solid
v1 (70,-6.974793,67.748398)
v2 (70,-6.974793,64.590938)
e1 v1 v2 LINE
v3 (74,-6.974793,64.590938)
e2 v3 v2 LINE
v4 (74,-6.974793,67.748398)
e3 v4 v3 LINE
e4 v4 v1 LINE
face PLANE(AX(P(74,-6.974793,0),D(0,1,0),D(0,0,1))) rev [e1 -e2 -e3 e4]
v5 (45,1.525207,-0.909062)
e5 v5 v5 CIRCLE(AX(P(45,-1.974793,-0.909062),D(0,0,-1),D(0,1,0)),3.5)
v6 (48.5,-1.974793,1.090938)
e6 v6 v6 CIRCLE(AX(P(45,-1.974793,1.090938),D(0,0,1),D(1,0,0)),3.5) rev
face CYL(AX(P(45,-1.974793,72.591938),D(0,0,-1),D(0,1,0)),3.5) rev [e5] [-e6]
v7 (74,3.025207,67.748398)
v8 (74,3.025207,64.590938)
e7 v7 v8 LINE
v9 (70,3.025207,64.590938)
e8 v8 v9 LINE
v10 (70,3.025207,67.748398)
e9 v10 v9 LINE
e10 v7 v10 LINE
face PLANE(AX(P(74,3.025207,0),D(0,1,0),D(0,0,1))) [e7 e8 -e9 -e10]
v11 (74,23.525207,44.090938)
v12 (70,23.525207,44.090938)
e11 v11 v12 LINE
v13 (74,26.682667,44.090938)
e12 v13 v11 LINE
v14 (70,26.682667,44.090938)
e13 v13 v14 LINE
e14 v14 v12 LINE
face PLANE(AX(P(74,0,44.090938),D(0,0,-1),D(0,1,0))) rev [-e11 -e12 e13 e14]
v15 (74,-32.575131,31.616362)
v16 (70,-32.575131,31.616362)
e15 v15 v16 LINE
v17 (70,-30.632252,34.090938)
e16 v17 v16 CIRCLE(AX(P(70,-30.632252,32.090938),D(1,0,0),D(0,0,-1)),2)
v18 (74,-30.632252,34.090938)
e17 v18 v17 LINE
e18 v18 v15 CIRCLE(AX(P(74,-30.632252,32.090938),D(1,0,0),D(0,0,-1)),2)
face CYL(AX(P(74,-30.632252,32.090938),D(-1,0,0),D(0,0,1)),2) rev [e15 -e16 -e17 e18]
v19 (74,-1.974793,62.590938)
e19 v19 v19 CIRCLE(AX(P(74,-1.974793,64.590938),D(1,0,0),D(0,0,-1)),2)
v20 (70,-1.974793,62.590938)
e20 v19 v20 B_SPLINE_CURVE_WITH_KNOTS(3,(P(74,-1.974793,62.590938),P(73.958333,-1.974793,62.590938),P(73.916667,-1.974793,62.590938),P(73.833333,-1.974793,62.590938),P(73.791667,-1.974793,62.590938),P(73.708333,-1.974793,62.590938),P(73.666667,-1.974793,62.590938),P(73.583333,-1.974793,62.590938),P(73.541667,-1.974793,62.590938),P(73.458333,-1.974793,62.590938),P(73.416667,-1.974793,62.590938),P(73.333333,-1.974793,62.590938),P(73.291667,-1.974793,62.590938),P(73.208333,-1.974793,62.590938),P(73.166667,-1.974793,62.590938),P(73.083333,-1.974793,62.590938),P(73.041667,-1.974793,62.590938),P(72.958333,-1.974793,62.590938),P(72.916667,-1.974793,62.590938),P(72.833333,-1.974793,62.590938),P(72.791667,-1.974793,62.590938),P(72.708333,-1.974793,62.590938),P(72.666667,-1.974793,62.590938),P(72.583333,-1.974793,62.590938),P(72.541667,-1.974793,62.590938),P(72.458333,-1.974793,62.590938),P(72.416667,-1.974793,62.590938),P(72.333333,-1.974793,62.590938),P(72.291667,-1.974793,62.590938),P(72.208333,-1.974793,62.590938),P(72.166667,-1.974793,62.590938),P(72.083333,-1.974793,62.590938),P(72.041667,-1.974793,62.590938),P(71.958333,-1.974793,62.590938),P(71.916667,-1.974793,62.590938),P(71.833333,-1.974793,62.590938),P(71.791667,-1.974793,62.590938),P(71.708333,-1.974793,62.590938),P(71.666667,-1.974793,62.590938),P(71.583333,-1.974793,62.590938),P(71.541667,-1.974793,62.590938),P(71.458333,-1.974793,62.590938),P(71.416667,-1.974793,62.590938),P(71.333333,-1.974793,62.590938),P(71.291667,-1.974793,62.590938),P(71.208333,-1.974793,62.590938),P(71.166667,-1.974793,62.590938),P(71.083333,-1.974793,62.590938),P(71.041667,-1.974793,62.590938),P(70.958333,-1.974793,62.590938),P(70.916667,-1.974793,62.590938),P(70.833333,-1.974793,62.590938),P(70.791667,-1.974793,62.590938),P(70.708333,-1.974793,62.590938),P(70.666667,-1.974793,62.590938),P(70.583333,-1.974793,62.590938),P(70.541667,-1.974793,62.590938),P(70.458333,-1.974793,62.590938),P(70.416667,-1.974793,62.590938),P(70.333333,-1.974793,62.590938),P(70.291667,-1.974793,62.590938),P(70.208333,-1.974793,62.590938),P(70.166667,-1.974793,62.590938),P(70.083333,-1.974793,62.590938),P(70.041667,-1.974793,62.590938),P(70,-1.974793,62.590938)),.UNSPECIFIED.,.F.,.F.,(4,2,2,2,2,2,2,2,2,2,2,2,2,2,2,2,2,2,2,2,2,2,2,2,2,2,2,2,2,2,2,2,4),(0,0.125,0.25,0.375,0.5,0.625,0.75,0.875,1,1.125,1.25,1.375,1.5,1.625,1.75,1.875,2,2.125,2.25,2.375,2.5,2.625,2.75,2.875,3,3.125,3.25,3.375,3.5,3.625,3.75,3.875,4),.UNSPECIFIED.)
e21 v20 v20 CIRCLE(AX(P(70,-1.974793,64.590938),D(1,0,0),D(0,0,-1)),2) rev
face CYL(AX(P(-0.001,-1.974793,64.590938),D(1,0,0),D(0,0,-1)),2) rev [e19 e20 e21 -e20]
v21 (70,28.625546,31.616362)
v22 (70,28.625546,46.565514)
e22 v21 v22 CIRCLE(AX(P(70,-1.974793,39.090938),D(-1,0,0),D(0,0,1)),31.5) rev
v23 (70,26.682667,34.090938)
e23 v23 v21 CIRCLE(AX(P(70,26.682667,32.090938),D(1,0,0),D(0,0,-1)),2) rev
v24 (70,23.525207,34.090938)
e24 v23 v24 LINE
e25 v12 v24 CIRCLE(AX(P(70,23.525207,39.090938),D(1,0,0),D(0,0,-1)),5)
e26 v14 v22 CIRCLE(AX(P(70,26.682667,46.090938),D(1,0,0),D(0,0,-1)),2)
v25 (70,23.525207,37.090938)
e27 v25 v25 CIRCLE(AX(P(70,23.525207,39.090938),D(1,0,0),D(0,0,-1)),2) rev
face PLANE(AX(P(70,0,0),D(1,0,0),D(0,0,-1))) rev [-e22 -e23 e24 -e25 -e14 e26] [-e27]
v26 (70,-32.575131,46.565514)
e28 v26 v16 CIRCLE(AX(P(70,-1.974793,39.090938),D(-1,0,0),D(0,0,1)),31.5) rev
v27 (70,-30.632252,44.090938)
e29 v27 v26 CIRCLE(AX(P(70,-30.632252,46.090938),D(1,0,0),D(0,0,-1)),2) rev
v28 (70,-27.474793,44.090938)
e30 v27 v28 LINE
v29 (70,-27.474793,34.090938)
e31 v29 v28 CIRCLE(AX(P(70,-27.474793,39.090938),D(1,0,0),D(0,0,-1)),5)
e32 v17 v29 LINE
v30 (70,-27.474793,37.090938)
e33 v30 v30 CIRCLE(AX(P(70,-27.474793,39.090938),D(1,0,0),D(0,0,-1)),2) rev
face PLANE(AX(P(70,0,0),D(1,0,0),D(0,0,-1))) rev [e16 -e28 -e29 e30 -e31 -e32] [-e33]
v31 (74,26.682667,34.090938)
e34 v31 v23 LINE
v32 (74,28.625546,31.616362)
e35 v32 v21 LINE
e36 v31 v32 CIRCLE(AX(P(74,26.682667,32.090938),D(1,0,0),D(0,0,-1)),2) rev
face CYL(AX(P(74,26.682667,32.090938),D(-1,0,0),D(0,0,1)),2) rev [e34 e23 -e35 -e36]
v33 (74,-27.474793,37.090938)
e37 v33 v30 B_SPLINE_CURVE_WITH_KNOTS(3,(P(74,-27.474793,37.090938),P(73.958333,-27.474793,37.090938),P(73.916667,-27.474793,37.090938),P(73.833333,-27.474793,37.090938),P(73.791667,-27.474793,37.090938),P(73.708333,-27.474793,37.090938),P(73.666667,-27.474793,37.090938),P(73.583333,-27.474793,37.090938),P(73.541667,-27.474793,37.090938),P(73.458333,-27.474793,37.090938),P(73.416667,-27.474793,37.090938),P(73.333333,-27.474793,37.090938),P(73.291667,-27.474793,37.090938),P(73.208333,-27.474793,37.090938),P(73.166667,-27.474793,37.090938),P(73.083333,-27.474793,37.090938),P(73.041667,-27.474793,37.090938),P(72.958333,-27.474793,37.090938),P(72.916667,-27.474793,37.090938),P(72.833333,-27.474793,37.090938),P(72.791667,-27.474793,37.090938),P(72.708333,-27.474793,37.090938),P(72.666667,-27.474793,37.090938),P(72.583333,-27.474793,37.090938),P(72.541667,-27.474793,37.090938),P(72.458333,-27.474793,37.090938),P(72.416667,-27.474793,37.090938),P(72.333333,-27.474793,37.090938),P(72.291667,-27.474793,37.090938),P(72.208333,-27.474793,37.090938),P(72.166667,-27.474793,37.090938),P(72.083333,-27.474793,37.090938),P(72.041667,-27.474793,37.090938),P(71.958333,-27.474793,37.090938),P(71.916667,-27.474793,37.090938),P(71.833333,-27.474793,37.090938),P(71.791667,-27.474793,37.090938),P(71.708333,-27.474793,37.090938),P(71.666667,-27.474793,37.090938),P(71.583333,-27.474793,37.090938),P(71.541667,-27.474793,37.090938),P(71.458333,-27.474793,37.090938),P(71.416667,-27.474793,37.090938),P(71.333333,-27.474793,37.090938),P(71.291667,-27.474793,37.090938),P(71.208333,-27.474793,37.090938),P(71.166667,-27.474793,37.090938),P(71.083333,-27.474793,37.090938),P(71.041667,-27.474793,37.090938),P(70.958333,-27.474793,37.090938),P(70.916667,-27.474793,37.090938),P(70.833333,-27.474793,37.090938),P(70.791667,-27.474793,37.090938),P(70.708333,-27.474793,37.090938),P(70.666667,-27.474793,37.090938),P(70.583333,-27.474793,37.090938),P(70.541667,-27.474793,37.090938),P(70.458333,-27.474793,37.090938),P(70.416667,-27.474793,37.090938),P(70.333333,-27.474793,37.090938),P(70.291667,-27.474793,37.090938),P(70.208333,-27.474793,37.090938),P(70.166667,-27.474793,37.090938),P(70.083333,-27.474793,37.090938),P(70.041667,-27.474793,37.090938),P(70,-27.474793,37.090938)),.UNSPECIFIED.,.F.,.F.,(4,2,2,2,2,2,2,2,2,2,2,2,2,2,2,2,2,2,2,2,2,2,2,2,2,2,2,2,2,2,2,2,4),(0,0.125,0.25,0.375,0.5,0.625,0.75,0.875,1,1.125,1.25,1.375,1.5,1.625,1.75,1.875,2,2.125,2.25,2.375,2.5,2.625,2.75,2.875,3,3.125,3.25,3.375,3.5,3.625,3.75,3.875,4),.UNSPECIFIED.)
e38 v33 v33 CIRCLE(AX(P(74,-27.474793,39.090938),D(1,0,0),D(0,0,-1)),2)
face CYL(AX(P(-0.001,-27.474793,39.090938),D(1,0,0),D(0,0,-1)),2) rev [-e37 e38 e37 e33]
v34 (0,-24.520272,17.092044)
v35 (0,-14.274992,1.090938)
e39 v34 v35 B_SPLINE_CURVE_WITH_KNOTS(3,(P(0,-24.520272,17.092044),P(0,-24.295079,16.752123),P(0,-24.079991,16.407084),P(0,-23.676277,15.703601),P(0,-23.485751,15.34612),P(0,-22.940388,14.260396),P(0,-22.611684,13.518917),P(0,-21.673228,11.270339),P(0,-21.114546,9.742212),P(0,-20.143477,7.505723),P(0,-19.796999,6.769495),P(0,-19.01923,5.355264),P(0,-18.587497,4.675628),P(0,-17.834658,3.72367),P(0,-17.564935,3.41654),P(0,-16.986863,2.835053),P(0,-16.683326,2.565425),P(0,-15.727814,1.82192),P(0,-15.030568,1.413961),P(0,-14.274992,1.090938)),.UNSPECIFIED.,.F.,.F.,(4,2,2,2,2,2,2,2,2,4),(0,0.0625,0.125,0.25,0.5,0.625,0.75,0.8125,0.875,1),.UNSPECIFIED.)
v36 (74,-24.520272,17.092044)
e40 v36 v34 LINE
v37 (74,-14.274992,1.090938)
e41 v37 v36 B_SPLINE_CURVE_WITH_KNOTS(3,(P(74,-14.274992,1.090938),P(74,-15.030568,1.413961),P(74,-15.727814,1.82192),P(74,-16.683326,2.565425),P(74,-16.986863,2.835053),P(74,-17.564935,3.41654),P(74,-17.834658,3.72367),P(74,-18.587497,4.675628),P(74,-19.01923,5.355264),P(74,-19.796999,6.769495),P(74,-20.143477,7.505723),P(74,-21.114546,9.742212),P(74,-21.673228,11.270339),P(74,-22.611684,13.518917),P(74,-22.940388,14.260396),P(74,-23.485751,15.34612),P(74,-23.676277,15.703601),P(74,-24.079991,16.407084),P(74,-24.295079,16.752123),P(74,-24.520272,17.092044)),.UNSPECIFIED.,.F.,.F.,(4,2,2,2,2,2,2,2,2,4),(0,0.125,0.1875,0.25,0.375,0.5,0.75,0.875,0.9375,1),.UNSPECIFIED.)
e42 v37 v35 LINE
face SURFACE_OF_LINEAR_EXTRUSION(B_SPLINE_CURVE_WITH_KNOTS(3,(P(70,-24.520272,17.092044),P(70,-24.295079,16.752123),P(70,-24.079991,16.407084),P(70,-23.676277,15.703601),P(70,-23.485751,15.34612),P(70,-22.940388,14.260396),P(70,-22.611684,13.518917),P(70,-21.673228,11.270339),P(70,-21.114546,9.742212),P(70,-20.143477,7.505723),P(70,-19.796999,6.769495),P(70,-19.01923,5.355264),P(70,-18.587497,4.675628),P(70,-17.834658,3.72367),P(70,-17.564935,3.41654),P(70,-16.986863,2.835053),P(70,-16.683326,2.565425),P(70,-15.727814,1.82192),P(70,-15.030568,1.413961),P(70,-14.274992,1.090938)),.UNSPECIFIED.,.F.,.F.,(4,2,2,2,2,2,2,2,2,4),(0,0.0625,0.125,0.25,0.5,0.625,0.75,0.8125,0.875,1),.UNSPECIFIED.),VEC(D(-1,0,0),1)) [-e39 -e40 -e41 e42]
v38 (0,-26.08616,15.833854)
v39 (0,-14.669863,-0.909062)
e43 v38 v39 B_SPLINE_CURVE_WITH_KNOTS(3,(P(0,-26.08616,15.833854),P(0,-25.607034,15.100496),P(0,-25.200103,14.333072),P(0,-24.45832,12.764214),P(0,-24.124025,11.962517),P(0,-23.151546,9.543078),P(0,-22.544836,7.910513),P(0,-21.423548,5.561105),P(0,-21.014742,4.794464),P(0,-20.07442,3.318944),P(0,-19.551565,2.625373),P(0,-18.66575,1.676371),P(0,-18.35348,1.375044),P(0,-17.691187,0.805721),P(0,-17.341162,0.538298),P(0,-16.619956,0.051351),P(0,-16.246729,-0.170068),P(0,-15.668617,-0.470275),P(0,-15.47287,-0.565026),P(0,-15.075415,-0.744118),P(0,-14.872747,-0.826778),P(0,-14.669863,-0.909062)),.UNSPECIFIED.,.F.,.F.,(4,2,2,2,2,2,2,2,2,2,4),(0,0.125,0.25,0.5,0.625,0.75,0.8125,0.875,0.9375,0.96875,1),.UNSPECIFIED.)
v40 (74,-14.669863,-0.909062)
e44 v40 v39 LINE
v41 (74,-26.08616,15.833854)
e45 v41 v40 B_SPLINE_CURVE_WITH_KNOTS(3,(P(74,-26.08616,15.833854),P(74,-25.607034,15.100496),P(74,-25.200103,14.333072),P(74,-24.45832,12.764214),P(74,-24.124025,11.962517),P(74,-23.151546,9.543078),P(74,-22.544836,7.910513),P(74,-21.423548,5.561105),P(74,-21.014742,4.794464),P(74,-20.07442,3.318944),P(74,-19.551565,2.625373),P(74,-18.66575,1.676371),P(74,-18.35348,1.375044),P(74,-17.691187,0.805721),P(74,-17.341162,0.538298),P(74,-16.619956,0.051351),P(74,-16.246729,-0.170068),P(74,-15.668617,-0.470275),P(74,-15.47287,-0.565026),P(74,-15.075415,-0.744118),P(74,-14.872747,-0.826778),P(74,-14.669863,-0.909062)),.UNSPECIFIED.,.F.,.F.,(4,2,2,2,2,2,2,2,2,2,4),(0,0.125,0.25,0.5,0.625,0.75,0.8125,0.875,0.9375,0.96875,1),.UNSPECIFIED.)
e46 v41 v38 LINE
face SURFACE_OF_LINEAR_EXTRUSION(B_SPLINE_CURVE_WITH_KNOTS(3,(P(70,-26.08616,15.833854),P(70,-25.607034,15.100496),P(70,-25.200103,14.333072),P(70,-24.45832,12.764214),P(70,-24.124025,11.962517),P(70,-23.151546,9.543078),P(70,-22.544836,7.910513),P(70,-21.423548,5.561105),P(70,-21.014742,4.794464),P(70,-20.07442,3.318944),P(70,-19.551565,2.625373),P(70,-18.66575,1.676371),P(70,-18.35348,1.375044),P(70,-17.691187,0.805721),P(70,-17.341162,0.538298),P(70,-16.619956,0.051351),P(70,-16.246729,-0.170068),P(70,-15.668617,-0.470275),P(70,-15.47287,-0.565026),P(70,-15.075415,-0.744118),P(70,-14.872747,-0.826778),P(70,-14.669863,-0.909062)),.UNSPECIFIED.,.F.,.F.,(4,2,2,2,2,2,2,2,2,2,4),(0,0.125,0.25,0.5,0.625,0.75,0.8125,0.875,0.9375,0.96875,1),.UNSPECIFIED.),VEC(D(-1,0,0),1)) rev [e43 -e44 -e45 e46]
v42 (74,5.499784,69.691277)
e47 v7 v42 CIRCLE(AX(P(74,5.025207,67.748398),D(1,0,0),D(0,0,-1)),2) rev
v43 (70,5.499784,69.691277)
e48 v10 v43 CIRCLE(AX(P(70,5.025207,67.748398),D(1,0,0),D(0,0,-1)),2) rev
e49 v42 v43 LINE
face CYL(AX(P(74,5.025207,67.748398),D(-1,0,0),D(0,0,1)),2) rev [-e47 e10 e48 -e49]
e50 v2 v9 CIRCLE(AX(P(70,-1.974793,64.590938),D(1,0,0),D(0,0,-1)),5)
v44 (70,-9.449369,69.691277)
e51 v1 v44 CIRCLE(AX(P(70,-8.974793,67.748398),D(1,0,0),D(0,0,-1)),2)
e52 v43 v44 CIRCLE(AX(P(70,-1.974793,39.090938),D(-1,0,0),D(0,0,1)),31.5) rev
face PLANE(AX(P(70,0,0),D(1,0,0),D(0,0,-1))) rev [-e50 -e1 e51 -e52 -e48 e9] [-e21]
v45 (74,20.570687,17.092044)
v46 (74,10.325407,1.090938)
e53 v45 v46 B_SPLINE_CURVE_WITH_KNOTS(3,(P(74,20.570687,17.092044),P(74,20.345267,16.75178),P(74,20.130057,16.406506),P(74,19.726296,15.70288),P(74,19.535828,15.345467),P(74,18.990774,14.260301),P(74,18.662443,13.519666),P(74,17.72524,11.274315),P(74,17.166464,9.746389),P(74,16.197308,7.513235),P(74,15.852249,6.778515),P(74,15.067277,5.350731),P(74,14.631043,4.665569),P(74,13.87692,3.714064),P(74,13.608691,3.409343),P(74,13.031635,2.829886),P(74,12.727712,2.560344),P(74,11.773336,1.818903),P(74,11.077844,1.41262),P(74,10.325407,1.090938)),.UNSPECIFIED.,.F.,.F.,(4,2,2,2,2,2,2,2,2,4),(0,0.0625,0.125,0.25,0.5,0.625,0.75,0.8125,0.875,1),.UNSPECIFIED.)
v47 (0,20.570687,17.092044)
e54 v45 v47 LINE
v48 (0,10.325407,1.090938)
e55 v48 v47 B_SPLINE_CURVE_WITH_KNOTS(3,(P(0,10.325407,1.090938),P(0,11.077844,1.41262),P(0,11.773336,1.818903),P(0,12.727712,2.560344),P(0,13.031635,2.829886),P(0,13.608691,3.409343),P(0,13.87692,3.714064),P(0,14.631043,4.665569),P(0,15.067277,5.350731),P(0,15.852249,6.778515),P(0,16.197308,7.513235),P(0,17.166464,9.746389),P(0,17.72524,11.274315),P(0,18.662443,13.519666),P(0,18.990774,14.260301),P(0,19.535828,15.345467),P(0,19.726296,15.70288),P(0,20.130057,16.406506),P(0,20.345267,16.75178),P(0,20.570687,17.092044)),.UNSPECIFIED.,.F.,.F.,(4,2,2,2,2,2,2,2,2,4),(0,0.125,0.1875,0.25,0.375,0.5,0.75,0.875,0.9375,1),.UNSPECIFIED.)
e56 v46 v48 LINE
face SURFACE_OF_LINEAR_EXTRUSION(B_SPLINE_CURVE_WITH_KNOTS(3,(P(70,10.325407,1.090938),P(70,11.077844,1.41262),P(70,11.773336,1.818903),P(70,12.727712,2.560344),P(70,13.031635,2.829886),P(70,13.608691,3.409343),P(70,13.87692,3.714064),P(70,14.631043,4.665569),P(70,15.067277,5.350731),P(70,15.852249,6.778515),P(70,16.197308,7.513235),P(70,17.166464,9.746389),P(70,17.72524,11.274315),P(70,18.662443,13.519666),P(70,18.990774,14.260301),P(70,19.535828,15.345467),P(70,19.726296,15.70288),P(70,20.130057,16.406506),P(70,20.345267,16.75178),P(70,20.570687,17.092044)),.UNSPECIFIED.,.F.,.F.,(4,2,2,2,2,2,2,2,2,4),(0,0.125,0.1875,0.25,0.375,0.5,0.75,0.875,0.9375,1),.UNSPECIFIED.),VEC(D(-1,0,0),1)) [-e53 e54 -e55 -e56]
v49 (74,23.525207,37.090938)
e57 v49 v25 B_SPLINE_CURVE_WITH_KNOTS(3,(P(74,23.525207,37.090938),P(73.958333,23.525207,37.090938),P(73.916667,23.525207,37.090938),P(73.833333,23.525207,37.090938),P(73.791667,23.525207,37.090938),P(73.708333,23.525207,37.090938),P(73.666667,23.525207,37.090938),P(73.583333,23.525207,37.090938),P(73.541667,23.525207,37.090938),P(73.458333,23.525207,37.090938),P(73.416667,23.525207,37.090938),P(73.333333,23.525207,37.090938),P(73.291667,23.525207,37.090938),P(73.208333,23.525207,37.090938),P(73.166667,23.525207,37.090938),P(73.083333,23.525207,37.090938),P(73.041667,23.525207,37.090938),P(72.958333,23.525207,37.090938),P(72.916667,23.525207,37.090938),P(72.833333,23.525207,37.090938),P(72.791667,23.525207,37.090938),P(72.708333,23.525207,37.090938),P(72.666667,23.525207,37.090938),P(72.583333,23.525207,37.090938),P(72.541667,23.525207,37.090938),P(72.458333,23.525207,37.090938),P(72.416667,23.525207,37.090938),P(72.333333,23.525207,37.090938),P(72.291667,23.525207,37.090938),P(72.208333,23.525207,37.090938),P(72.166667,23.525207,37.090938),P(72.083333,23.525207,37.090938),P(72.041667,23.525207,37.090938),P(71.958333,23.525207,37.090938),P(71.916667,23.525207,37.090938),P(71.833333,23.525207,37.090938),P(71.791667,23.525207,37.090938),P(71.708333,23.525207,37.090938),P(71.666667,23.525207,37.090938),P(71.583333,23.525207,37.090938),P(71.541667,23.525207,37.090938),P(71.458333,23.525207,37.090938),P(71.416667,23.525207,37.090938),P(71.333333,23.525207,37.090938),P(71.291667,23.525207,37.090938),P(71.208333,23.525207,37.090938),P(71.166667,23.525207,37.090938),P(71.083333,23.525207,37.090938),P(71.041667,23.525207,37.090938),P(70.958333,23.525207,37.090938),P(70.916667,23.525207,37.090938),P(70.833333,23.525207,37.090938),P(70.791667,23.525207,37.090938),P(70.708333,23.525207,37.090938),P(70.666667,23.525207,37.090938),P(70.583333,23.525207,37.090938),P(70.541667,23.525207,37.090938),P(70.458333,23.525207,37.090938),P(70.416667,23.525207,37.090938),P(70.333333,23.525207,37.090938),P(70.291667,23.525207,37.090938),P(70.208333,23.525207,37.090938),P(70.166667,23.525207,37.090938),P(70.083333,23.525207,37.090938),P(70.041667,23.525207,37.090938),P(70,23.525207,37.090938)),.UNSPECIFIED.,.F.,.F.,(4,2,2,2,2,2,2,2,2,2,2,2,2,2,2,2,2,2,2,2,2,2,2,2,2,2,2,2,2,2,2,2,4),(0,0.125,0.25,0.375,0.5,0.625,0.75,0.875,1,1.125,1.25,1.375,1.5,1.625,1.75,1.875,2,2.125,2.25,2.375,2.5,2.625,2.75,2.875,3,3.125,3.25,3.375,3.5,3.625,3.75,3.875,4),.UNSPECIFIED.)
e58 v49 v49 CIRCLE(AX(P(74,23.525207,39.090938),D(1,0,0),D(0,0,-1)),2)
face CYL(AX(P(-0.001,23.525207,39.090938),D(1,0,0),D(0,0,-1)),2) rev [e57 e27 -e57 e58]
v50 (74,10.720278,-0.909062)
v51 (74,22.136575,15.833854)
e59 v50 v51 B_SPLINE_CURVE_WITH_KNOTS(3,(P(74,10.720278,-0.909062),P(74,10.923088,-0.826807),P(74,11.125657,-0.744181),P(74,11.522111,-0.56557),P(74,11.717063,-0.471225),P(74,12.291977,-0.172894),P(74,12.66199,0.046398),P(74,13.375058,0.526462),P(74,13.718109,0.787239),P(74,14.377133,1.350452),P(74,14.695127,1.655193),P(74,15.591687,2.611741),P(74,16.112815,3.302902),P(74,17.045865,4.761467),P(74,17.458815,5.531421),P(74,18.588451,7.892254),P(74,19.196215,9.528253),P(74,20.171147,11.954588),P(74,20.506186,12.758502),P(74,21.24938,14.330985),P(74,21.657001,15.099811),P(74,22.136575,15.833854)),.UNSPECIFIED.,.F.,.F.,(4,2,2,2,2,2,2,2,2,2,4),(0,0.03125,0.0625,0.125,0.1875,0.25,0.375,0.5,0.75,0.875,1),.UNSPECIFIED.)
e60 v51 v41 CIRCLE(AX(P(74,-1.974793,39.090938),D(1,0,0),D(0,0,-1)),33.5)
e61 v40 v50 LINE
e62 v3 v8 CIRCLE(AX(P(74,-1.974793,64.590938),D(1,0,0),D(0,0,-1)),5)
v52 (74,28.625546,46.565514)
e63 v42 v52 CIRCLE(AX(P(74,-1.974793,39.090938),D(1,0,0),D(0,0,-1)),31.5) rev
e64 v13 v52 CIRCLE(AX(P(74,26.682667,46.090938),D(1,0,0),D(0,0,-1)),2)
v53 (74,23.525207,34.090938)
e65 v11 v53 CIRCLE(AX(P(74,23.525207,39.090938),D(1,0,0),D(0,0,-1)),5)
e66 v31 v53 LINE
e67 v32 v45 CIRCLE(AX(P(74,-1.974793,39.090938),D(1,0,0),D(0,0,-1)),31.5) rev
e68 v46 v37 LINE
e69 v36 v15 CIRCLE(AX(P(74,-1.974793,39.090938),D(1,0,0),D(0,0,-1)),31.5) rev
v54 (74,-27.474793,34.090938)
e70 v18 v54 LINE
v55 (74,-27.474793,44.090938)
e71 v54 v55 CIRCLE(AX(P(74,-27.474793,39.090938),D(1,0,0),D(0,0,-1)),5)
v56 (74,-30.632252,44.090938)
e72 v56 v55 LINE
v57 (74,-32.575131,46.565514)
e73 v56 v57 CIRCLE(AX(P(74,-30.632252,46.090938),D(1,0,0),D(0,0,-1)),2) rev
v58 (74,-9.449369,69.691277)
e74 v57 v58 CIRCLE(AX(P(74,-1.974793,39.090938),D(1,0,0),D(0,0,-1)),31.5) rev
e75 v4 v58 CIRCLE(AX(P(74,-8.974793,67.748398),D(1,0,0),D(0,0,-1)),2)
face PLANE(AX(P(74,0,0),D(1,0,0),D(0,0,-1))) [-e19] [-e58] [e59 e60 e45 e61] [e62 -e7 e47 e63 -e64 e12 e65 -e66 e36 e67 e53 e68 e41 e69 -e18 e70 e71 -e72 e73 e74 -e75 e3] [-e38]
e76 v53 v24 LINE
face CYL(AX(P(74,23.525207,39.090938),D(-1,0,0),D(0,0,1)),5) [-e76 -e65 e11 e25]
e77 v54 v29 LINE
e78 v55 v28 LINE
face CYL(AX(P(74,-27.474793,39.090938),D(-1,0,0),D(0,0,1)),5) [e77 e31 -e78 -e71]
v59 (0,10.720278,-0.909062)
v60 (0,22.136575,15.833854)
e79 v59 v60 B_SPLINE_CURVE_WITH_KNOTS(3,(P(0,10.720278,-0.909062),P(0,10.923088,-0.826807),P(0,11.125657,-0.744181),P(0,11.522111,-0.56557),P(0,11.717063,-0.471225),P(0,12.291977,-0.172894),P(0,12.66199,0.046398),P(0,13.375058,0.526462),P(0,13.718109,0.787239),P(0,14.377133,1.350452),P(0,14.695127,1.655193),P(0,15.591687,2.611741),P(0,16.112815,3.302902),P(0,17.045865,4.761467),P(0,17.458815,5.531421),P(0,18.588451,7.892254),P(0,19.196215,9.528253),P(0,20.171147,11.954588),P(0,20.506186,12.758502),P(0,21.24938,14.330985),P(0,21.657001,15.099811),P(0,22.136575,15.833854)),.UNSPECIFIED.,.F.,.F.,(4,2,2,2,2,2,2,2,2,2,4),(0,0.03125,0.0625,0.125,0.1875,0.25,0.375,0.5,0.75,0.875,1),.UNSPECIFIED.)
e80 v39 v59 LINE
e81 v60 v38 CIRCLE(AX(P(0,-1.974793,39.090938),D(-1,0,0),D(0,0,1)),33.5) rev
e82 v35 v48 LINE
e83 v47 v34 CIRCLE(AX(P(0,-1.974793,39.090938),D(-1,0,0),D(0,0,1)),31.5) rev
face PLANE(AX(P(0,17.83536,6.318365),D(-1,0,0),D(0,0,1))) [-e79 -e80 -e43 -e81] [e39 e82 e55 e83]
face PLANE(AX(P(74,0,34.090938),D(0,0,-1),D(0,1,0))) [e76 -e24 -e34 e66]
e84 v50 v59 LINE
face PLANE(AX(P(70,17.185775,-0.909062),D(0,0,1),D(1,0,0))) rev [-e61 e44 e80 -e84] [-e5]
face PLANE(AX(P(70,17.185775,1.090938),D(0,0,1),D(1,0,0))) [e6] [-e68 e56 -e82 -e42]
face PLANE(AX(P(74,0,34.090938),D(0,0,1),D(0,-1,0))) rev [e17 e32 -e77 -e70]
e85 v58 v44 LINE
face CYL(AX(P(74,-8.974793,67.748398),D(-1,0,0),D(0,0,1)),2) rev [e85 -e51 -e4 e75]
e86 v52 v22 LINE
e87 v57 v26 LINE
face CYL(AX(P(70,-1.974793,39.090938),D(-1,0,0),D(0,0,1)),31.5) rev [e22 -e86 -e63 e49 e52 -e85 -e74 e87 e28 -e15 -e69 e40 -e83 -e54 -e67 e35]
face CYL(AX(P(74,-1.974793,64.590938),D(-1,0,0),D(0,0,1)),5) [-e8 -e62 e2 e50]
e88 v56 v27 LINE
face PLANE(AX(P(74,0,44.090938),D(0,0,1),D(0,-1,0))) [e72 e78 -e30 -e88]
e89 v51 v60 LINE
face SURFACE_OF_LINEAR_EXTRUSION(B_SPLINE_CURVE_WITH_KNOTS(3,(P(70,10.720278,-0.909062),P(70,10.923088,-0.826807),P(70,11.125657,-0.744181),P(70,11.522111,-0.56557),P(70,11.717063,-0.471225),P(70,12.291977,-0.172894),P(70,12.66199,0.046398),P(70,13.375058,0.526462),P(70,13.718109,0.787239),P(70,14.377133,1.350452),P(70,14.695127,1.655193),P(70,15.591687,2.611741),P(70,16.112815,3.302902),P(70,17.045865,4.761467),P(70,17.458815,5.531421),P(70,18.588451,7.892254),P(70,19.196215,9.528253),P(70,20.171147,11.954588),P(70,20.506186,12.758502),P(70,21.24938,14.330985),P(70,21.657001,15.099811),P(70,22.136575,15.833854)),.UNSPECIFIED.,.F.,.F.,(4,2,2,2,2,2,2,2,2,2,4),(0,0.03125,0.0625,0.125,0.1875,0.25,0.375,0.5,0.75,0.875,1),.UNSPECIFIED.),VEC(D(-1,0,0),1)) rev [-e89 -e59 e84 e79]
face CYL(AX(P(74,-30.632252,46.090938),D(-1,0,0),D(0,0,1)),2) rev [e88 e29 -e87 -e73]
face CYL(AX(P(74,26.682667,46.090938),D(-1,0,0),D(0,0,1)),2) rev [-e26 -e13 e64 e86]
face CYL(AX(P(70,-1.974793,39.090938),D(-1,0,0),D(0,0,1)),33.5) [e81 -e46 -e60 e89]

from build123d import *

# Parameters (mm, degrees)
EXTRUDE_THIN3_DEPTH = 70
CUT_EXTRUDE2_REACH  = 109.521
SKETCH14_R          = 3.5
BOSS_EXTRUDE2_DEPTH = 4
CUT_EXTRUDE3_REACH  = 111.562
SKETCH16_R          = 2


# Read off the part's stored shape, not the designer's step: Extrude-Thin3
with BuildPart() as part:
    # Extrude-Thin3 outline → Extrude-Thin3 (new body)
    with BuildSketch(Plane(origin=(0, 0, 0), x_dir=(0, 0, -1), z_dir=(1, 0, 0))):
        with BuildLine():
            Line((0.909061836, -14.669862969), (0.909061836, 10.720277827))
            add(Edge.make_bspline(
                [(0.909061836, 10.720277827), (0.826807355, 10.923087932), (0.744181279, 11.125656518), (0.56557007, 11.522110942), (0.471224829, 11.717062632), (0.172894413, 12.291976881), (-0.046398469, 12.661990163), (-0.526461943, 13.3750582), (-0.787239132, 13.718108666), (-1.350452209, 14.377133437), (-1.655192648, 14.695127232), (-2.611741239, 15.59168673), (-3.302902398, 16.112815322), (-4.761466671, 17.045865484), (-5.53142089, 17.458814961), (-7.892254177, 18.588450633), (-9.528253043, 19.196215177), (-11.954588006, 20.171146985), (-12.758502474, 20.50618552), (-14.330984575, 21.249380319), (-15.099811003, 21.657001246), (-15.833853889, 22.136574686)],
                knots=[0, 0, 0, 0, 0.03125, 0.03125, 0.0625, 0.0625, 0.125, 0.125, 0.1875, 0.1875, 0.25, 0.25, 0.375, 0.375, 0.5, 0.5, 0.75, 0.75, 0.875, 0.875, 1, 1, 1, 1], degree=3))
            ThreePointArc((-15.833853889, 22.136574686), (-72.590938164, -1.974792572), (-15.833853889, -26.086159829))
            add(Edge.make_bspline(
                [(-15.833853889, -26.086159829), (-15.100496012, -25.607033927), (-14.33307243, -25.200103061), (-12.764214382, -24.458320177), (-11.962517255, -24.124024817), (-9.543078024, -23.151545958), (-7.91051316, -22.544836021), (-5.561104569, -21.423547872), (-4.79446395, -21.014741551), (-3.318943636, -20.074420204), (-2.625372945, -19.551564831), (-1.676371211, -18.665750443), (-1.375044416, -18.353480395), (-0.805721249, -17.691186874), (-0.538297709, -17.341162489), (-0.051350693, -16.619956398), (0.170067695, -16.246729246), (0.470274569, -15.668617459), (0.565026353, -15.472870038), (0.74411778, -15.075415403), (0.826777522, -14.872746631), (0.909061836, -14.669862969)],
                knots=[0, 0, 0, 0, 0.125, 0.125, 0.25, 0.25, 0.5, 0.5, 0.625, 0.625, 0.75, 0.75, 0.8125, 0.8125, 0.875, 0.875, 0.9375, 0.9375, 0.96875, 0.96875, 1, 1, 1, 1], degree=3))
        make_face()
        with BuildLine():
            add(Edge.make_bspline(
                [(-1.090938164, 10.325407182), (-1.412619551, 11.077844383), (-1.818903118, 11.773335552), (-2.560343937, 12.727712215), (-2.82988586, 13.031635411), (-3.409343177, 13.608690849), (-3.714063514, 13.876920015), (-4.665569169, 14.631043316), (-5.350730703, 15.067277009), (-6.778514977, 15.852248881), (-7.51323501, 16.197307873), (-9.746388539, 17.166464268), (-11.274315356, 17.725239814), (-13.519666401, 18.662442973), (-14.260301039, 18.990774084), (-15.345466848, 19.53582833), (-15.702879517, 19.72629627), (-16.406506385, 20.130056979), (-16.751779952, 20.345266955), (-17.092044079, 20.57068722)],
                knots=[0, 0, 0, 0, 0.125, 0.125, 0.1875, 0.1875, 0.25, 0.25, 0.375, 0.375, 0.5, 0.5, 0.75, 0.75, 0.875, 0.875, 0.9375, 0.9375, 1, 1, 1, 1], degree=3))
            Line((-1.090938164, 10.325407182), (-1.090938164, -14.274992324))
            add(Edge.make_bspline(
                [(-17.092044079, -24.520272363), (-16.75212318, -24.295079481), (-16.407083703, -24.079991441), (-15.70360059, -23.676277181), (-15.346119507, -23.485750739), (-14.260396239, -22.940388161), (-13.518917037, -22.611683886), (-11.270338851, -21.673228184), (-9.742212218, -21.11454584), (-7.505722666, -20.143477325), (-6.769494687, -19.796998712), (-5.355263551, -19.019229951), (-4.67562832, -18.587497232), (-3.723670077, -17.834658118), (-3.416539548, -17.564934821), (-2.835052735, -16.986863036), (-2.565424759, -16.68332576), (-1.821919986, -15.727813675), (-1.413961463, -15.03056836), (-1.090938164, -14.274992324)],
                knots=[0, 0, 0, 0, 0.0625, 0.0625, 0.125, 0.125, 0.25, 0.25, 0.5, 0.5, 0.625, 0.625, 0.75, 0.75, 0.8125, 0.8125, 0.875, 0.875, 1, 1, 1, 1], degree=3))
            ThreePointArc((-17.092044079, -24.520272363), (-70.590938164, -1.974792572), (-17.092044079, 20.57068722))
        make_face(mode=Mode.SUBTRACT)
    extrude(amount=EXTRUDE_THIN3_DEPTH)

    # Sketch14 → Cut-Extrude2 (cut, up to next)
    with BuildSketch(Plane(origin=(0, 0, -0.909061836), x_dir=(-1, 0, 0), z_dir=(0, 0, -1)), mode=Mode.PRIVATE) as cut_extrude2_sk1:
        with Locations(Location((-45, -1.974792571, 0), (0, 0, 90))):
            Circle(SKETCH14_R)
    cut_extrude2_tool1 = extrude(cut_extrude2_sk1.sketch, amount=-CUT_EXTRUDE2_REACH, mode=Mode.PRIVATE) & part.part
    add(cut_extrude2_tool1.solids().sort_by_distance((45, -1.974793, -0.909062))[0], mode=Mode.SUBTRACT)

    # Sketch15 → Boss-Extrude2 (add)
    # profile 1 of 4: a face of its own
    with BuildSketch(Plane(origin=(70, 0, 0), x_dir=(0, 0, -1), z_dir=(1, 0, 0))):
        with BuildLine():
            Line((0.909061836, -14.669862969), (0.909061836, 10.720277827))
            add(Edge.make_bspline(
                [(0.909061836, 10.720277827), (0.826807355, 10.923087932), (0.744181279, 11.125656518), (0.56557007, 11.522110942), (0.471224829, 11.717062632), (0.172894413, 12.291976881), (-0.046398469, 12.661990163), (-0.526461943, 13.3750582), (-0.787239132, 13.718108666), (-1.350452209, 14.377133437), (-1.655192648, 14.695127232), (-2.611741239, 15.59168673), (-3.302902398, 16.112815322), (-4.761466671, 17.045865484), (-5.53142089, 17.458814961), (-7.892254177, 18.588450633), (-9.528253043, 19.196215177), (-11.954588006, 20.171146985), (-12.758502474, 20.50618552), (-14.330984575, 21.249380319), (-15.099811003, 21.657001246), (-15.833853889, 22.136574686)],
                knots=[0, 0, 0, 0, 0.03125, 0.03125, 0.0625, 0.0625, 0.125, 0.125, 0.1875, 0.1875, 0.25, 0.25, 0.375, 0.375, 0.5, 0.5, 0.75, 0.75, 0.875, 0.875, 1, 1, 1, 1], degree=3))
            ThreePointArc((-15.833853889, 22.136574686), (-72.590938164, -1.974792571), (-15.833853889, -26.086159829))
            add(Edge.make_bspline(
                [(-15.833853889, -26.086159829), (-15.100496012, -25.607033927), (-14.33307243, -25.200103061), (-12.764214382, -24.458320177), (-11.962517255, -24.124024817), (-9.543078024, -23.151545958), (-7.91051316, -22.544836021), (-5.561104569, -21.423547872), (-4.79446395, -21.014741551), (-3.318943636, -20.074420204), (-2.625372945, -19.551564831), (-1.676371211, -18.665750443), (-1.375044416, -18.353480395), (-0.805721249, -17.691186874), (-0.538297709, -17.341162489), (-0.051350693, -16.619956398), (0.170067695, -16.246729246), (0.470274569, -15.668617459), (0.565026353, -15.472870038), (0.74411778, -15.075415403), (0.826777522, -14.872746631), (0.909061836, -14.669862969)],
                knots=[0, 0, 0, 0, 0.125, 0.125, 0.25, 0.25, 0.5, 0.5, 0.625, 0.625, 0.75, 0.75, 0.8125, 0.8125, 0.875, 0.875, 0.9375, 0.9375, 0.96875, 0.96875, 1, 1, 1, 1], degree=3))
        make_face()
        with BuildLine():
            ThreePointArc((-17.092044079, -24.520272363), (-70.590938164, -1.974792571), (-17.092044079, 20.57068722))
            add(Edge.make_bspline(
                [(-17.092044079, 20.57068722), (-16.751779952, 20.345266955), (-16.406506385, 20.130056979), (-15.702879517, 19.72629627), (-15.345466848, 19.53582833), (-14.260301039, 18.990774084), (-13.519666401, 18.662442973), (-11.274315356, 17.725239814), (-9.746388539, 17.166464268), (-7.51323501, 16.197307873), (-6.778514977, 15.852248881), (-5.350730703, 15.067277009), (-4.665569169, 14.631043316), (-3.714063514, 13.876920015), (-3.409343177, 13.608690849), (-2.82988586, 13.031635411), (-2.560343937, 12.727712215), (-1.818903118, 11.773335552), (-1.412619551, 11.077844383), (-1.090938164, 10.325407182)],
                knots=[0, 0, 0, 0, 0.0625, 0.0625, 0.125, 0.125, 0.25, 0.25, 0.5, 0.5, 0.625, 0.625, 0.75, 0.75, 0.8125, 0.8125, 0.875, 0.875, 1, 1, 1, 1], degree=3))
            Line((-1.090938164, 10.325407182), (-1.090938164, -14.274992324))
            add(Edge.make_bspline(
                [(-1.090938164, -14.274992324), (-1.413961463, -15.03056836), (-1.821919986, -15.727813675), (-2.565424759, -16.68332576), (-2.835052735, -16.986863036), (-3.416539548, -17.564934821), (-3.723670077, -17.834658118), (-4.67562832, -18.587497232), (-5.355263551, -19.019229951), (-6.769494687, -19.796998712), (-7.505722666, -20.143477325), (-9.742212218, -21.11454584), (-11.270338851, -21.673228184), (-13.518917037, -22.611683886), (-14.260396239, -22.940388161), (-15.346119507, -23.485750739), (-15.70360059, -23.676277181), (-16.407083703, -24.079991441), (-16.75212318, -24.295079481), (-17.092044079, -24.520272363)],
                knots=[0, 0, 0, 0, 0.125, 0.125, 0.1875, 0.1875, 0.25, 0.25, 0.375, 0.375, 0.5, 0.5, 0.75, 0.75, 0.875, 0.875, 0.9375, 0.9375, 1, 1, 1, 1], degree=3))
        make_face(mode=Mode.SUBTRACT)
    # profile 2 of 4: a face of its own
    with BuildSketch(Plane(origin=(70, 0, 0), x_dir=(0, 0, -1), z_dir=(1, 0, 0))):
        with BuildLine():
            ThreePointArc((-67.748397926, 3.025207429), (-69.321476522, 3.790126974), (-69.691276554, 5.4997837))
            ThreePointArc((-69.691276554, 5.4997837), (-70.590938164, -1.974792571), (-69.691276554, -9.449368842))
            ThreePointArc((-69.691276554, -9.449368842), (-69.321476522, -7.739712117), (-67.748397926, -6.974792571))
            Line((-67.748397926, -6.974792571), (-64.590938164, -6.974792571))
            ThreePointArc((-64.590938164, -6.974792571), (-59.590938164, -1.974792571), (-64.590938164, 3.025207429))
            Line((-64.590938164, 3.025207429), (-67.748397926, 3.025207429))
        make_face()
    # profile 3 of 4: a face of its own
    with BuildSketch(Plane(origin=(70, 0, 0), x_dir=(0, 0, -1), z_dir=(1, 0, 0))):
        with BuildLine():
            Line((-34.090938164, 23.525207429), (-34.090938164, 26.682667191))
            ThreePointArc((-34.090938164, 26.682667191), (-33.326018618, 28.255745787), (-31.616361893, 28.625545818))
            ThreePointArc((-31.616361893, 28.625545818), (-39.090938164, 29.525207429), (-46.565514435, 28.625545818))
            ThreePointArc((-46.565514435, 28.625545818), (-44.85585771, 28.255745787), (-44.090938164, 26.682667191))
            Line((-44.090938164, 26.682667191), (-44.090938164, 23.525207429))
            ThreePointArc((-44.090938164, 23.525207429), (-39.090938164, 18.525207429), (-34.090938164, 23.525207429))
        make_face()
    # profile 4 of 4: a face of its own
    with BuildSketch(Plane(origin=(70, 0, 0), x_dir=(0, 0, -1), z_dir=(1, 0, 0))):
        with BuildLine():
            ThreePointArc((-44.090938164, -30.632252333), (-44.85585771, -32.20533093), (-46.565514435, -32.575130961))
            ThreePointArc((-46.565514435, -32.575130961), (-39.090938164, -33.474792571), (-31.616361893, -32.575130961))
            ThreePointArc((-31.616361893, -32.575130961), (-33.326018618, -32.20533093), (-34.090938164, -30.632252333))
            Line((-34.090938164, -30.632252333), (-34.090938164, -27.474792571))
            ThreePointArc((-34.090938164, -27.474792571), (-39.090938164, -22.474792571), (-44.090938164, -27.474792571))
            Line((-44.090938164, -27.474792571), (-44.090938164, -30.632252333))
        make_face()
    extrude(amount=BOSS_EXTRUDE2_DEPTH)

    # Sketch16 → Cut-Extrude3 (cut, up to next)
    with BuildSketch(Plane(origin=(74, 0, 0), x_dir=(0, 0, -1), z_dir=(1, 0, 0)), mode=Mode.PRIVATE) as cut_extrude3_sk1:
        with Locations((-64.590938164, -1.974792571)):
            Circle(SKETCH16_R)
    cut_extrude3_tool1 = extrude(cut_extrude3_sk1.sketch, amount=-CUT_EXTRUDE3_REACH, mode=Mode.PRIVATE) & part.part
    # Sketch16 → Cut-Extrude3 (cut, up to next)
    with BuildSketch(Plane(origin=(74, 0, 0), x_dir=(0, 0, -1), z_dir=(1, 0, 0)), mode=Mode.PRIVATE) as cut_extrude3_sk2:
        with Locations((-39.090938164, 23.525207429)):
            Circle(SKETCH16_R)
    cut_extrude3_tool2 = extrude(cut_extrude3_sk2.sketch, amount=-CUT_EXTRUDE3_REACH, mode=Mode.PRIVATE) & part.part
    # Sketch16 → Cut-Extrude3 (cut, up to next)
    with BuildSketch(Plane(origin=(74, 0, 0), x_dir=(0, 0, -1), z_dir=(1, 0, 0)), mode=Mode.PRIVATE) as cut_extrude3_sk3:
        with Locations((-39.090938164, -27.474792571)):
            Circle(SKETCH16_R)
    cut_extrude3_tool3 = extrude(cut_extrude3_sk3.sketch, amount=-CUT_EXTRUDE3_REACH, mode=Mode.PRIVATE) & part.part
    add(cut_extrude3_tool1.solids().sort_by_distance((74, -1.974793, 64.590938))[0], mode=Mode.SUBTRACT)
    add(cut_extrude3_tool2.solids().sort_by_distance((74, 23.525207, 39.090938))[0], mode=Mode.SUBTRACT)
    add(cut_extrude3_tool3.solids().sort_by_distance((74, -27.474793, 39.090938))[0], mode=Mode.SUBTRACT)


solid = part.part
